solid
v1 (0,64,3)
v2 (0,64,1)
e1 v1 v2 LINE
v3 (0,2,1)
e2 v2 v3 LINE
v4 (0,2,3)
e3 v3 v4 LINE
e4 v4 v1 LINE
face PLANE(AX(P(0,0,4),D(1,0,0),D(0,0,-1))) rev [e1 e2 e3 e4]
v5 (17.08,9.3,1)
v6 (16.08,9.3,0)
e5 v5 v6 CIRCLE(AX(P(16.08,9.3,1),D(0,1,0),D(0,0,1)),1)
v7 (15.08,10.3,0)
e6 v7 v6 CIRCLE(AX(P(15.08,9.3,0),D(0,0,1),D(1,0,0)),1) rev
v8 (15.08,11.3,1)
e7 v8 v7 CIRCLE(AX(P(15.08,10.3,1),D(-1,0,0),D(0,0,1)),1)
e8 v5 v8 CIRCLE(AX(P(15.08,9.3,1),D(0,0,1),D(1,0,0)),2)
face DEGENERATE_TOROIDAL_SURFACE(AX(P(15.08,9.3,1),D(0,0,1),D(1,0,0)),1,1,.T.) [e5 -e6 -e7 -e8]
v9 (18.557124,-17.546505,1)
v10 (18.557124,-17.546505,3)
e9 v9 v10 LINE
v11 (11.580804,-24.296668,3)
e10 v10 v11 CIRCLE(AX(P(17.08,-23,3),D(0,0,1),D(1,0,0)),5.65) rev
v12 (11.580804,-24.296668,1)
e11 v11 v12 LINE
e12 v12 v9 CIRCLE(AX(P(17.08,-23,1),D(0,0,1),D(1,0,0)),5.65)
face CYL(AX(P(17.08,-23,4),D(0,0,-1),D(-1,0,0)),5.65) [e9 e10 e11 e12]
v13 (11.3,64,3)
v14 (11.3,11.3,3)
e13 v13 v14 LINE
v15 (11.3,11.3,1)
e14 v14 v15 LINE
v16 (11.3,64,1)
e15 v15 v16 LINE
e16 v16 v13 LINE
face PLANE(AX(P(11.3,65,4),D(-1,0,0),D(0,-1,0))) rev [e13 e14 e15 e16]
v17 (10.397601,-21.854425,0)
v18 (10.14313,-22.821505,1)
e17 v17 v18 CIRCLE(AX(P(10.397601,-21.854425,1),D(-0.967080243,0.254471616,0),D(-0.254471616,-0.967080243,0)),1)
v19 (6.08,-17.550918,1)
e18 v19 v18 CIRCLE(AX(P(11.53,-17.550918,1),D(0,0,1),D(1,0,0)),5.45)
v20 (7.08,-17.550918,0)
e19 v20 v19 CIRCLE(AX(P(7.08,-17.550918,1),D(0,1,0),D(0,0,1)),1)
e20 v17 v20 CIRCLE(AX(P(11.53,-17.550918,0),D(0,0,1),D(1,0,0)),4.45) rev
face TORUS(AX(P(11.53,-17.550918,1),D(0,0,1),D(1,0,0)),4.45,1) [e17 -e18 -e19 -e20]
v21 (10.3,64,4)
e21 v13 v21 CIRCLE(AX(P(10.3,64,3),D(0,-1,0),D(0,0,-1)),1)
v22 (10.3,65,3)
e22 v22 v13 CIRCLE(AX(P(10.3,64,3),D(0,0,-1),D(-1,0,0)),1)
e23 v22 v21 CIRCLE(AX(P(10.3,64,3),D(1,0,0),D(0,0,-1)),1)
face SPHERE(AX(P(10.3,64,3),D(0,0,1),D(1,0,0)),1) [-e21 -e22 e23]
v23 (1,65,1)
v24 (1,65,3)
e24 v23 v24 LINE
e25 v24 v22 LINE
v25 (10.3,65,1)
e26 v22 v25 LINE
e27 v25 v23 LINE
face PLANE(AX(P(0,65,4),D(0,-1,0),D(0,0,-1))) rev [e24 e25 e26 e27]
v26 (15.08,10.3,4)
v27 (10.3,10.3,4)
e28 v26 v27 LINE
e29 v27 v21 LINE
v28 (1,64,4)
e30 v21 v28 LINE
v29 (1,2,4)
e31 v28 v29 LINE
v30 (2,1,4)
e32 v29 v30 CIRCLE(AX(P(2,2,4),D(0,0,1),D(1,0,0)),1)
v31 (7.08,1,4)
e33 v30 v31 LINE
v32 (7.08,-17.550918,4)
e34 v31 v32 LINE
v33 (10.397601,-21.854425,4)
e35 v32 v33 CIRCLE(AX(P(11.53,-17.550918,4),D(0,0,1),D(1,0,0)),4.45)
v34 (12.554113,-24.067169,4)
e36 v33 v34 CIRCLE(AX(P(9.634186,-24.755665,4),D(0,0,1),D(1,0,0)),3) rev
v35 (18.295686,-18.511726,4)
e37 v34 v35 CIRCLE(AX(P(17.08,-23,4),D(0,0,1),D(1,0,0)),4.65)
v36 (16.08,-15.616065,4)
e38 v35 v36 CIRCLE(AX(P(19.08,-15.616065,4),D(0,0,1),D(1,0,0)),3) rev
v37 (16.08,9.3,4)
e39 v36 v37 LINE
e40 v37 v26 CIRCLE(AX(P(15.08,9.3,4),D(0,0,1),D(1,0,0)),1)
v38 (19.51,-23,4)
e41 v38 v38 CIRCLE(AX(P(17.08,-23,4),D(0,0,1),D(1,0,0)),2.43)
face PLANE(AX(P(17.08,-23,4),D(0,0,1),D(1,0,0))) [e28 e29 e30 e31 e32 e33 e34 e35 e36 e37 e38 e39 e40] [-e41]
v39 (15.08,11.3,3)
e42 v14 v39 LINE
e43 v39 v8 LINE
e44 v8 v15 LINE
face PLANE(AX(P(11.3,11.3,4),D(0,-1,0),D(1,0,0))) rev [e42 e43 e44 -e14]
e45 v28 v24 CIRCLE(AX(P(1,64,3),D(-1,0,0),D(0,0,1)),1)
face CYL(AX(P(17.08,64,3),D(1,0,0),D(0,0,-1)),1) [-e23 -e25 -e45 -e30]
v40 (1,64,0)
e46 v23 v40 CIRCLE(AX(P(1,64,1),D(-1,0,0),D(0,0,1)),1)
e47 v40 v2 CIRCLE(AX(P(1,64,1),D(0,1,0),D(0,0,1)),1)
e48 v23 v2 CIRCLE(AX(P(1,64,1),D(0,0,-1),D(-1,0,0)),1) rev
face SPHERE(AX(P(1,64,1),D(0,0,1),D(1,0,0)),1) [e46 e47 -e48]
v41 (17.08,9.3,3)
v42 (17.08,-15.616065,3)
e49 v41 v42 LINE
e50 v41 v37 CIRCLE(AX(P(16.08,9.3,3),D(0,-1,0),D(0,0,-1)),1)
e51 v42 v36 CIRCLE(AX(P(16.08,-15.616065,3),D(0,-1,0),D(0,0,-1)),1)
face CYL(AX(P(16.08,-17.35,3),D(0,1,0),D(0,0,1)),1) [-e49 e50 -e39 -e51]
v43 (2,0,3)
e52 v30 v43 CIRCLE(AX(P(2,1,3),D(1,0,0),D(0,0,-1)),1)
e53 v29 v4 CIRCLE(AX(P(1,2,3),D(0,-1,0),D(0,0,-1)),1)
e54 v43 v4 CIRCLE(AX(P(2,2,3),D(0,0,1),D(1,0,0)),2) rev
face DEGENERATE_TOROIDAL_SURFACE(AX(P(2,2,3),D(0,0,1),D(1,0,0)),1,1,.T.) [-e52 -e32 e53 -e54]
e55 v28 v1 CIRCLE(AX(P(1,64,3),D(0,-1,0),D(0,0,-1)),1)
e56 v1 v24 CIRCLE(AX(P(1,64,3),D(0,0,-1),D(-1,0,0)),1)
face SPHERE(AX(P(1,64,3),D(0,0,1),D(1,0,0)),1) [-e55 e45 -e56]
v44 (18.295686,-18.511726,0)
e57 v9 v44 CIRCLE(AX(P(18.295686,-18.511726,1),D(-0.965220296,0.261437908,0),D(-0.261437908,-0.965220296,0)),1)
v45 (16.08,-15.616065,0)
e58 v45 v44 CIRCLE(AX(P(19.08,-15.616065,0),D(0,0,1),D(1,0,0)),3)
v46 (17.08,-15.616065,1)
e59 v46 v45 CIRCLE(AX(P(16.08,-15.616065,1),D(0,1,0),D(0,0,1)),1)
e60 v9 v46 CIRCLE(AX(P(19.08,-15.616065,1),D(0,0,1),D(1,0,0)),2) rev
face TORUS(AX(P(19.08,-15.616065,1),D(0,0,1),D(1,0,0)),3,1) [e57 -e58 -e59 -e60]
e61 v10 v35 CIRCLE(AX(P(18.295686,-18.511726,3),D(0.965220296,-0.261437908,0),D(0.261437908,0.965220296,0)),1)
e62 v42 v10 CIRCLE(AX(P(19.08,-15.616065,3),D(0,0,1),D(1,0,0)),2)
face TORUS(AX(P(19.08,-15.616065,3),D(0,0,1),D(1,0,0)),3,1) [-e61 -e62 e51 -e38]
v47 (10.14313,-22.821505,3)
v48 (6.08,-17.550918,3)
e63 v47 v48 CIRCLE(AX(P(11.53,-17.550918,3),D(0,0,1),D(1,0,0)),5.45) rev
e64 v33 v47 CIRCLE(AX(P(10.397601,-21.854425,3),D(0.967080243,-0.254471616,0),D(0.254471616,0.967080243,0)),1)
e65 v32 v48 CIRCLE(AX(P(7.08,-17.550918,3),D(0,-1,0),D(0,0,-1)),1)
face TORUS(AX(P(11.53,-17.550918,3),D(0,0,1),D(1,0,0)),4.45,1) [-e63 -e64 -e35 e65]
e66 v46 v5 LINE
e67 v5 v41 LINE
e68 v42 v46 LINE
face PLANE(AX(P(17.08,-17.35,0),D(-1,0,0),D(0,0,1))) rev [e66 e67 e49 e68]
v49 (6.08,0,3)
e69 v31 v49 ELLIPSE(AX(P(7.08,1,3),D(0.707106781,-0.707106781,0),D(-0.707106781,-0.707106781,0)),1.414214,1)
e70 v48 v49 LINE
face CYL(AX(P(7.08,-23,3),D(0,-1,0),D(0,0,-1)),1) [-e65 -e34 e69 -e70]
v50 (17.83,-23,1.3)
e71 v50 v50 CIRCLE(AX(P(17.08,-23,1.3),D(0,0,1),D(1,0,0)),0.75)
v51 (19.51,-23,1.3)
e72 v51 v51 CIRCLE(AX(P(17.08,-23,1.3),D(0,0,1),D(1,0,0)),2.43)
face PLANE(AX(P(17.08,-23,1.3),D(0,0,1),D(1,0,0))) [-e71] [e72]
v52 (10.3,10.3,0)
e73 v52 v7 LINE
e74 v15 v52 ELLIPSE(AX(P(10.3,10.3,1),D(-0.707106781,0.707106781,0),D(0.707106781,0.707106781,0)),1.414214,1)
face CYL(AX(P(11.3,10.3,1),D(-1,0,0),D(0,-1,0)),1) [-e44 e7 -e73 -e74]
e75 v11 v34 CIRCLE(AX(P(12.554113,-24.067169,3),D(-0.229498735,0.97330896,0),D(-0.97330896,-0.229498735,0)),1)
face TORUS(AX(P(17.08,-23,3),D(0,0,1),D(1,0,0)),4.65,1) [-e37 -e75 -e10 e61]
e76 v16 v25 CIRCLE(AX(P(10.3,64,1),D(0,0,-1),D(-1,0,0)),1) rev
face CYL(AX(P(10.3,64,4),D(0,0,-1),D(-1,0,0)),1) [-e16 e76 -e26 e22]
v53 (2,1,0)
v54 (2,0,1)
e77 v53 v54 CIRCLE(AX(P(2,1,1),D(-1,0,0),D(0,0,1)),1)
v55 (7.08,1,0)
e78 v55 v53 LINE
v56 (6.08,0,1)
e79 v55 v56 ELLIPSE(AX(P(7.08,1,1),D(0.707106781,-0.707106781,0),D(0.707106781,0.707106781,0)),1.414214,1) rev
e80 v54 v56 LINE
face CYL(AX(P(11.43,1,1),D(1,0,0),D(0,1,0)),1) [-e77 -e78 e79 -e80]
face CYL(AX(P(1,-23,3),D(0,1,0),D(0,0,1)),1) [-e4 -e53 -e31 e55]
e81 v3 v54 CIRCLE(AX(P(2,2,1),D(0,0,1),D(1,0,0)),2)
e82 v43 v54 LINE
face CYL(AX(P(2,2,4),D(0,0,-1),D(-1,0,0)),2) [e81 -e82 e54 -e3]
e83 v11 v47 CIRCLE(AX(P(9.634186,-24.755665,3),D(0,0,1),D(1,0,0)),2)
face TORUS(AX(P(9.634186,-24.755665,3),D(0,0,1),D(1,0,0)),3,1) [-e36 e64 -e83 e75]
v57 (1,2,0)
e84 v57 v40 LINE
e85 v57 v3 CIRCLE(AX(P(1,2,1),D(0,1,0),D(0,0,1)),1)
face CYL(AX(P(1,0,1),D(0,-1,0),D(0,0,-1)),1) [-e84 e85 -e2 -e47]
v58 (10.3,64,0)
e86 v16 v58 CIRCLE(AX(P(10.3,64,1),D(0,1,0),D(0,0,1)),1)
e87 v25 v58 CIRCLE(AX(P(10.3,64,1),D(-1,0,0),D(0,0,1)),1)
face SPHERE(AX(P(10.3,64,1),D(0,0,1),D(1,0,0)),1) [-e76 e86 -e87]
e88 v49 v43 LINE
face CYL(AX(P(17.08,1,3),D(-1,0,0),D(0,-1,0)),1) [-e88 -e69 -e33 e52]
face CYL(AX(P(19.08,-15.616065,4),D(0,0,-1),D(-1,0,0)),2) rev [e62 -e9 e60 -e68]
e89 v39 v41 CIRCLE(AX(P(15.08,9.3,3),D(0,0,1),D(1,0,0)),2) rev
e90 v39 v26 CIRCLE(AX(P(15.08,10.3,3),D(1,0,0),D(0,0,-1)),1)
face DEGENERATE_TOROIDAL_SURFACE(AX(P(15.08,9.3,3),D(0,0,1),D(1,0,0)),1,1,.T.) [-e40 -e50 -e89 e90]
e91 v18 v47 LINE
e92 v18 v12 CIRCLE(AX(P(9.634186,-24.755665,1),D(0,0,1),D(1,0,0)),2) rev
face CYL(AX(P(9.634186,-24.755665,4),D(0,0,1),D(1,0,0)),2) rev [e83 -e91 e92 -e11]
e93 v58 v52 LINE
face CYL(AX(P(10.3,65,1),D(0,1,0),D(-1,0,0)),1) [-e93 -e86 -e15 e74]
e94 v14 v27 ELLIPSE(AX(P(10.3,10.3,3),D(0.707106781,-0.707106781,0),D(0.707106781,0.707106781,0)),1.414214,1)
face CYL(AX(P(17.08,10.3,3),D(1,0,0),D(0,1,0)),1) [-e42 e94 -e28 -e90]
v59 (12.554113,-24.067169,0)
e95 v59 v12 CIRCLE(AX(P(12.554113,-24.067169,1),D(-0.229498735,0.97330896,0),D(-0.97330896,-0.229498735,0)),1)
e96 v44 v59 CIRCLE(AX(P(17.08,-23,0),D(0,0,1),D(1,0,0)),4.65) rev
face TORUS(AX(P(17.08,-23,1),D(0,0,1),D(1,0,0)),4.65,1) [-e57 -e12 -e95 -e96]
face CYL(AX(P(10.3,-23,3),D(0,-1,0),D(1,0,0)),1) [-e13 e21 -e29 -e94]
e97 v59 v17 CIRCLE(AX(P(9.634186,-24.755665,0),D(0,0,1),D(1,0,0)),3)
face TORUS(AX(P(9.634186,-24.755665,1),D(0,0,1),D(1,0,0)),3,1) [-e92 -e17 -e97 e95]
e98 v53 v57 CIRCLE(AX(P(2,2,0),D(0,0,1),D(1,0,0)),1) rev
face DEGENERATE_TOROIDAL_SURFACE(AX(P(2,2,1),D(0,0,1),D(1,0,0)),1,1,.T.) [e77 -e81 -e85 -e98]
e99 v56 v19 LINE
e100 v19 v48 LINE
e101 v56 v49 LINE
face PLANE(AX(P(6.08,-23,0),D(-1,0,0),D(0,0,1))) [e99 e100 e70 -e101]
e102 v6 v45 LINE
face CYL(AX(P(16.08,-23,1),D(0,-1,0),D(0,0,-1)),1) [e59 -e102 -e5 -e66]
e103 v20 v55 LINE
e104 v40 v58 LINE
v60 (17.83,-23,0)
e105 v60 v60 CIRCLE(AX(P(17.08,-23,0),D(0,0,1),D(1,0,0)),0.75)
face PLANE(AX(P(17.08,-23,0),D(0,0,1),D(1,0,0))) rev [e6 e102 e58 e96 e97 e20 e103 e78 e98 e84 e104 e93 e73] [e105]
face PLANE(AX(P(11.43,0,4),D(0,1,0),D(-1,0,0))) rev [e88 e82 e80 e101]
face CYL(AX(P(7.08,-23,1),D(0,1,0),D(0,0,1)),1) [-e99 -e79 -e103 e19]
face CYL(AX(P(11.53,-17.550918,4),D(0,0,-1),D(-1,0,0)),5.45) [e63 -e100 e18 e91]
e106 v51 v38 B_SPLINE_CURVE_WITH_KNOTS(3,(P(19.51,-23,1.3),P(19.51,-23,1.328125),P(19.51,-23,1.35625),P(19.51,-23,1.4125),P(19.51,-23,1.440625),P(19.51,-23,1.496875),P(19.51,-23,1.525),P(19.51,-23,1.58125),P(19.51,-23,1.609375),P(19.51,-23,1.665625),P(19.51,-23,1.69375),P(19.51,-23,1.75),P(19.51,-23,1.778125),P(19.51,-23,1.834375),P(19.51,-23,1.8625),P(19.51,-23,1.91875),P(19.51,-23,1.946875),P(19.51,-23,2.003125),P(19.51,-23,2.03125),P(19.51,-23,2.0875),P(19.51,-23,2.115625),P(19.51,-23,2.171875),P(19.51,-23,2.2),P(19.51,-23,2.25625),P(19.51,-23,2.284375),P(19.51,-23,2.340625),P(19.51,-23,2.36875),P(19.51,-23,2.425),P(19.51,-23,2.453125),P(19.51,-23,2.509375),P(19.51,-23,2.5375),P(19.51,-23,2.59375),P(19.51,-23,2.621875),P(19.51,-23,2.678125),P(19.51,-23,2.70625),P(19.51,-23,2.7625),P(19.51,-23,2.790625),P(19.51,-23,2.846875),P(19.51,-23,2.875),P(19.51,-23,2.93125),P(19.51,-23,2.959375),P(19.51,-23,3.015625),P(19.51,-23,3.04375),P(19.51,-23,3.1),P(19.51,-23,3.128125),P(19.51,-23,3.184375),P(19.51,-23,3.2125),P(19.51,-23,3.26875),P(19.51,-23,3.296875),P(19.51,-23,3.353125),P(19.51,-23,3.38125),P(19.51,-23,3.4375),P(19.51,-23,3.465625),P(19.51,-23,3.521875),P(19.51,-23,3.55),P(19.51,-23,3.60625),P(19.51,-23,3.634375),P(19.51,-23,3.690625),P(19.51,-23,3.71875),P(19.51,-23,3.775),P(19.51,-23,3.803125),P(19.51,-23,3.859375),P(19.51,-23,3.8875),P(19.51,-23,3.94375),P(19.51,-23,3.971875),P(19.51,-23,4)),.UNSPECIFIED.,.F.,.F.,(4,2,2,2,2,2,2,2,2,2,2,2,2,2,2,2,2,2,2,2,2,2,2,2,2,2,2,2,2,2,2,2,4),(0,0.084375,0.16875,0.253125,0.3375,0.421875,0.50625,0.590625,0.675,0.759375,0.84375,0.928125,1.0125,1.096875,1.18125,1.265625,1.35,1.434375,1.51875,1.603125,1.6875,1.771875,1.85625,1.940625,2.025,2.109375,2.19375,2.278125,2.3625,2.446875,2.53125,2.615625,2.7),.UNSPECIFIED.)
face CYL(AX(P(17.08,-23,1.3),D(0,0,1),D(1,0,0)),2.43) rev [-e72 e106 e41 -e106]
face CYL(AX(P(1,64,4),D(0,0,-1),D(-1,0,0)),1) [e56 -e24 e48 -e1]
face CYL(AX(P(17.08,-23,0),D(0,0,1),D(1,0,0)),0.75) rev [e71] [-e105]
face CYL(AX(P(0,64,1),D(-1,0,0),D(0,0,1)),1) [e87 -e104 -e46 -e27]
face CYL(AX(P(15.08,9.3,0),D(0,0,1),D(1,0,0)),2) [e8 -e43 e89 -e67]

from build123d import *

# Parameters (mm, degrees)
BOSS_EXTRU_1_DEPTH      = 4
ESQUISSE4_R             = 2.43
ENL_V_MAT_EXTRU_1_DEPTH = 2.7
ESQUISSE5_R             = 0.75
ENL_V_MAT_EXTRU_2_DEPTH = 1.3
CONG_1_R                = 1
ESQUISSE6_W             = 5.35
ESQUISSE6_H             = 23
BOSS_EXTRU_2_DEPTH      = 4
CONG_4_R                = 5.45
ENL_V_START             = -4
ENL_V_MAT_EXTRU_3_DEPTH = 4
CONG_5_R                = 2
CONG_6_R                = 2
CONG_7_R                = 1


with BuildPart() as part:
    # Esquisse3 → Boss.-Extru.1 (new body)
    with BuildSketch(Plane.XY):
        with BuildLine():
            Line((0, 0), (0, 65))
            Line((0, 65), (11.3, 65))
            Line((11.3, 65), (11.3, 11.3))
            Line((11.3, 11.3), (22.73, 11.3))
            Line((22.73, 11.3), (22.73, -23))
            ThreePointArc((22.73, -23), (17.08, -28.65), (11.43, -23))
            Line((11.43, -23), (11.43, 0))
            Line((11.43, 0), (0, 0))
        make_face()
    extrude(amount=BOSS_EXTRU_1_DEPTH)

    # Esquisse4 → Enlèv. mat.-Extru.1 (cut)
    with BuildSketch(Plane.XY.offset(4)):
        with Locations((17.08, -23)):
            Circle(ESQUISSE4_R)
    extrude(amount=-ENL_V_MAT_EXTRU_1_DEPTH, mode=Mode.SUBTRACT)

    # Esquisse5 → Enlèv. mat.-Extru.2 (cut)
    with BuildSketch(Plane.XY.offset(1.3)):
        with Locations((17.08, -23)):
            Circle(ESQUISSE5_R)
    extrude(amount=-ENL_V_MAT_EXTRU_2_DEPTH, mode=Mode.SUBTRACT)

    # Congé1
    cong_1_edges = [part.edges().sort_by_distance(p)[0] for p in [
        (0, 65, 2),
        (11.3, 65, 2),
    ]]
    fillet(cong_1_edges, radius=CONG_1_R)

    # Esquisse6 → Boss.-Extru.2 (add)
    with BuildSketch(Plane.XY.offset(4)):
        with Locations((8.755, -11.5)):
            Rectangle(ESQUISSE6_W, ESQUISSE6_H)
    extrude(amount=-BOSS_EXTRU_2_DEPTH)

    # Congé4
    # the kernel refuses this fillet: 5.45 mm, written as the material it takes off along each edge
    with BuildSketch(Plane(origin=(6.08, -23, 17.625), x_dir=(0, 1, 0), z_dir=(0, 0, -1))) as cong_4_piece_1_section:
        with BuildLine():
            CenterArc((CONG_4_R, CONG_4_R), CONG_4_R, 180, 90)
            Line((0, CONG_4_R), (0, 0))
            Line((0, 0), (CONG_4_R, 0))
        make_face()
    cong_4_piece_1 = extrude(amount=31.25, mode=Mode.PRIVATE)
    cong_4_piece_1 = cong_4_piece_1 - Plane(origin=(17.08, -23, 2), x_dir=(1, 0, 0), z_dir=(0, 0, -1)) * Cylinder(5.65, 85, mode=Mode.PRIVATE)
    add(cong_4_piece_1, mode=Mode.SUBTRACT)

    # Esquisse7 → Enlèv. mat.-Extru.3 (cut)
    with BuildSketch(Plane.XY.offset(4).offset(ENL_V_START)):
        with BuildLine():
            Line((17.08, -17.35), (17.08, 11.3))
            Line((17.08, 11.3), (22.73, 11.3))
            Line((22.73, 11.3), (22.73, -23))
            ThreePointArc((22.73, -23), (21.075153314, -19.004846686), (17.08, -17.35))
        make_face()
    extrude(amount=ENL_V_MAT_EXTRU_3_DEPTH, mode=Mode.SUBTRACT)

    # Congé5
    cong_5_edges = [part.edges().sort_by_distance(p)[0] for p in [
        (0, 0, 2),
        (17.08, 11.3, 2),
    ]]
    fillet(cong_5_edges, radius=CONG_5_R)

    # Congé6
    cong_6_edges = [part.edges().sort_by_distance(p)[0] for p in [
        (11.430000074, -22.999082493, 2),
        (17.08, -17.35, 2),
    ]]
    fillet(cong_6_edges, radius=CONG_6_R)

    # Congé7
    cong_7_edges = [part.edges().sort_by_distance(p)[0] for p in [
        (11.3, 37.65, 4),
        (0, 33, 0),
        (0, 33, 4),
        (5.65, 65, 0),
        (11.007106781, 64.707106781, 0),
        (0.292893219, 64.707106781, 0),
        (5.65, 65, 4),
        (11.007106781, 64.707106781, 4),
        (0.292893219, 64.707106781, 4),
        (6.08, -8.775, 0),
        (6.08, -8.775, 4),
        (7.213643754, -20.877396694, 4),
        (17.08, -3.158032367, 4),
        (17.08, -3.158032367, 0),
        (13.19, 11.3, 4),
        (4.04, 0, 4),
        (0.585786438, 0.585786438, 4),
        (16.494213562, 10.714213562, 4),
        (13.19, 11.3, 0),
        (4.04, 0, 0),
        (0.585786438, 0.585786438, 0),
        (16.494213562, 10.714213562, 0),
        (21.008529301, -27.060684367, 0),
        (11.3, 37.65, 0),
        (21.008529301, -27.060684367, 4),
        (7.213643754, -20.877396694, 0),
        (11.066365829, -23.35890716, 0),
        (11.066365829, -23.35890716, 4),
        (17.491643674, -16.831434713, 4),
        (17.491643674, -16.831434713, 0),
    ]]
    fillet(cong_7_edges, radius=CONG_7_R)


solid = part.part
